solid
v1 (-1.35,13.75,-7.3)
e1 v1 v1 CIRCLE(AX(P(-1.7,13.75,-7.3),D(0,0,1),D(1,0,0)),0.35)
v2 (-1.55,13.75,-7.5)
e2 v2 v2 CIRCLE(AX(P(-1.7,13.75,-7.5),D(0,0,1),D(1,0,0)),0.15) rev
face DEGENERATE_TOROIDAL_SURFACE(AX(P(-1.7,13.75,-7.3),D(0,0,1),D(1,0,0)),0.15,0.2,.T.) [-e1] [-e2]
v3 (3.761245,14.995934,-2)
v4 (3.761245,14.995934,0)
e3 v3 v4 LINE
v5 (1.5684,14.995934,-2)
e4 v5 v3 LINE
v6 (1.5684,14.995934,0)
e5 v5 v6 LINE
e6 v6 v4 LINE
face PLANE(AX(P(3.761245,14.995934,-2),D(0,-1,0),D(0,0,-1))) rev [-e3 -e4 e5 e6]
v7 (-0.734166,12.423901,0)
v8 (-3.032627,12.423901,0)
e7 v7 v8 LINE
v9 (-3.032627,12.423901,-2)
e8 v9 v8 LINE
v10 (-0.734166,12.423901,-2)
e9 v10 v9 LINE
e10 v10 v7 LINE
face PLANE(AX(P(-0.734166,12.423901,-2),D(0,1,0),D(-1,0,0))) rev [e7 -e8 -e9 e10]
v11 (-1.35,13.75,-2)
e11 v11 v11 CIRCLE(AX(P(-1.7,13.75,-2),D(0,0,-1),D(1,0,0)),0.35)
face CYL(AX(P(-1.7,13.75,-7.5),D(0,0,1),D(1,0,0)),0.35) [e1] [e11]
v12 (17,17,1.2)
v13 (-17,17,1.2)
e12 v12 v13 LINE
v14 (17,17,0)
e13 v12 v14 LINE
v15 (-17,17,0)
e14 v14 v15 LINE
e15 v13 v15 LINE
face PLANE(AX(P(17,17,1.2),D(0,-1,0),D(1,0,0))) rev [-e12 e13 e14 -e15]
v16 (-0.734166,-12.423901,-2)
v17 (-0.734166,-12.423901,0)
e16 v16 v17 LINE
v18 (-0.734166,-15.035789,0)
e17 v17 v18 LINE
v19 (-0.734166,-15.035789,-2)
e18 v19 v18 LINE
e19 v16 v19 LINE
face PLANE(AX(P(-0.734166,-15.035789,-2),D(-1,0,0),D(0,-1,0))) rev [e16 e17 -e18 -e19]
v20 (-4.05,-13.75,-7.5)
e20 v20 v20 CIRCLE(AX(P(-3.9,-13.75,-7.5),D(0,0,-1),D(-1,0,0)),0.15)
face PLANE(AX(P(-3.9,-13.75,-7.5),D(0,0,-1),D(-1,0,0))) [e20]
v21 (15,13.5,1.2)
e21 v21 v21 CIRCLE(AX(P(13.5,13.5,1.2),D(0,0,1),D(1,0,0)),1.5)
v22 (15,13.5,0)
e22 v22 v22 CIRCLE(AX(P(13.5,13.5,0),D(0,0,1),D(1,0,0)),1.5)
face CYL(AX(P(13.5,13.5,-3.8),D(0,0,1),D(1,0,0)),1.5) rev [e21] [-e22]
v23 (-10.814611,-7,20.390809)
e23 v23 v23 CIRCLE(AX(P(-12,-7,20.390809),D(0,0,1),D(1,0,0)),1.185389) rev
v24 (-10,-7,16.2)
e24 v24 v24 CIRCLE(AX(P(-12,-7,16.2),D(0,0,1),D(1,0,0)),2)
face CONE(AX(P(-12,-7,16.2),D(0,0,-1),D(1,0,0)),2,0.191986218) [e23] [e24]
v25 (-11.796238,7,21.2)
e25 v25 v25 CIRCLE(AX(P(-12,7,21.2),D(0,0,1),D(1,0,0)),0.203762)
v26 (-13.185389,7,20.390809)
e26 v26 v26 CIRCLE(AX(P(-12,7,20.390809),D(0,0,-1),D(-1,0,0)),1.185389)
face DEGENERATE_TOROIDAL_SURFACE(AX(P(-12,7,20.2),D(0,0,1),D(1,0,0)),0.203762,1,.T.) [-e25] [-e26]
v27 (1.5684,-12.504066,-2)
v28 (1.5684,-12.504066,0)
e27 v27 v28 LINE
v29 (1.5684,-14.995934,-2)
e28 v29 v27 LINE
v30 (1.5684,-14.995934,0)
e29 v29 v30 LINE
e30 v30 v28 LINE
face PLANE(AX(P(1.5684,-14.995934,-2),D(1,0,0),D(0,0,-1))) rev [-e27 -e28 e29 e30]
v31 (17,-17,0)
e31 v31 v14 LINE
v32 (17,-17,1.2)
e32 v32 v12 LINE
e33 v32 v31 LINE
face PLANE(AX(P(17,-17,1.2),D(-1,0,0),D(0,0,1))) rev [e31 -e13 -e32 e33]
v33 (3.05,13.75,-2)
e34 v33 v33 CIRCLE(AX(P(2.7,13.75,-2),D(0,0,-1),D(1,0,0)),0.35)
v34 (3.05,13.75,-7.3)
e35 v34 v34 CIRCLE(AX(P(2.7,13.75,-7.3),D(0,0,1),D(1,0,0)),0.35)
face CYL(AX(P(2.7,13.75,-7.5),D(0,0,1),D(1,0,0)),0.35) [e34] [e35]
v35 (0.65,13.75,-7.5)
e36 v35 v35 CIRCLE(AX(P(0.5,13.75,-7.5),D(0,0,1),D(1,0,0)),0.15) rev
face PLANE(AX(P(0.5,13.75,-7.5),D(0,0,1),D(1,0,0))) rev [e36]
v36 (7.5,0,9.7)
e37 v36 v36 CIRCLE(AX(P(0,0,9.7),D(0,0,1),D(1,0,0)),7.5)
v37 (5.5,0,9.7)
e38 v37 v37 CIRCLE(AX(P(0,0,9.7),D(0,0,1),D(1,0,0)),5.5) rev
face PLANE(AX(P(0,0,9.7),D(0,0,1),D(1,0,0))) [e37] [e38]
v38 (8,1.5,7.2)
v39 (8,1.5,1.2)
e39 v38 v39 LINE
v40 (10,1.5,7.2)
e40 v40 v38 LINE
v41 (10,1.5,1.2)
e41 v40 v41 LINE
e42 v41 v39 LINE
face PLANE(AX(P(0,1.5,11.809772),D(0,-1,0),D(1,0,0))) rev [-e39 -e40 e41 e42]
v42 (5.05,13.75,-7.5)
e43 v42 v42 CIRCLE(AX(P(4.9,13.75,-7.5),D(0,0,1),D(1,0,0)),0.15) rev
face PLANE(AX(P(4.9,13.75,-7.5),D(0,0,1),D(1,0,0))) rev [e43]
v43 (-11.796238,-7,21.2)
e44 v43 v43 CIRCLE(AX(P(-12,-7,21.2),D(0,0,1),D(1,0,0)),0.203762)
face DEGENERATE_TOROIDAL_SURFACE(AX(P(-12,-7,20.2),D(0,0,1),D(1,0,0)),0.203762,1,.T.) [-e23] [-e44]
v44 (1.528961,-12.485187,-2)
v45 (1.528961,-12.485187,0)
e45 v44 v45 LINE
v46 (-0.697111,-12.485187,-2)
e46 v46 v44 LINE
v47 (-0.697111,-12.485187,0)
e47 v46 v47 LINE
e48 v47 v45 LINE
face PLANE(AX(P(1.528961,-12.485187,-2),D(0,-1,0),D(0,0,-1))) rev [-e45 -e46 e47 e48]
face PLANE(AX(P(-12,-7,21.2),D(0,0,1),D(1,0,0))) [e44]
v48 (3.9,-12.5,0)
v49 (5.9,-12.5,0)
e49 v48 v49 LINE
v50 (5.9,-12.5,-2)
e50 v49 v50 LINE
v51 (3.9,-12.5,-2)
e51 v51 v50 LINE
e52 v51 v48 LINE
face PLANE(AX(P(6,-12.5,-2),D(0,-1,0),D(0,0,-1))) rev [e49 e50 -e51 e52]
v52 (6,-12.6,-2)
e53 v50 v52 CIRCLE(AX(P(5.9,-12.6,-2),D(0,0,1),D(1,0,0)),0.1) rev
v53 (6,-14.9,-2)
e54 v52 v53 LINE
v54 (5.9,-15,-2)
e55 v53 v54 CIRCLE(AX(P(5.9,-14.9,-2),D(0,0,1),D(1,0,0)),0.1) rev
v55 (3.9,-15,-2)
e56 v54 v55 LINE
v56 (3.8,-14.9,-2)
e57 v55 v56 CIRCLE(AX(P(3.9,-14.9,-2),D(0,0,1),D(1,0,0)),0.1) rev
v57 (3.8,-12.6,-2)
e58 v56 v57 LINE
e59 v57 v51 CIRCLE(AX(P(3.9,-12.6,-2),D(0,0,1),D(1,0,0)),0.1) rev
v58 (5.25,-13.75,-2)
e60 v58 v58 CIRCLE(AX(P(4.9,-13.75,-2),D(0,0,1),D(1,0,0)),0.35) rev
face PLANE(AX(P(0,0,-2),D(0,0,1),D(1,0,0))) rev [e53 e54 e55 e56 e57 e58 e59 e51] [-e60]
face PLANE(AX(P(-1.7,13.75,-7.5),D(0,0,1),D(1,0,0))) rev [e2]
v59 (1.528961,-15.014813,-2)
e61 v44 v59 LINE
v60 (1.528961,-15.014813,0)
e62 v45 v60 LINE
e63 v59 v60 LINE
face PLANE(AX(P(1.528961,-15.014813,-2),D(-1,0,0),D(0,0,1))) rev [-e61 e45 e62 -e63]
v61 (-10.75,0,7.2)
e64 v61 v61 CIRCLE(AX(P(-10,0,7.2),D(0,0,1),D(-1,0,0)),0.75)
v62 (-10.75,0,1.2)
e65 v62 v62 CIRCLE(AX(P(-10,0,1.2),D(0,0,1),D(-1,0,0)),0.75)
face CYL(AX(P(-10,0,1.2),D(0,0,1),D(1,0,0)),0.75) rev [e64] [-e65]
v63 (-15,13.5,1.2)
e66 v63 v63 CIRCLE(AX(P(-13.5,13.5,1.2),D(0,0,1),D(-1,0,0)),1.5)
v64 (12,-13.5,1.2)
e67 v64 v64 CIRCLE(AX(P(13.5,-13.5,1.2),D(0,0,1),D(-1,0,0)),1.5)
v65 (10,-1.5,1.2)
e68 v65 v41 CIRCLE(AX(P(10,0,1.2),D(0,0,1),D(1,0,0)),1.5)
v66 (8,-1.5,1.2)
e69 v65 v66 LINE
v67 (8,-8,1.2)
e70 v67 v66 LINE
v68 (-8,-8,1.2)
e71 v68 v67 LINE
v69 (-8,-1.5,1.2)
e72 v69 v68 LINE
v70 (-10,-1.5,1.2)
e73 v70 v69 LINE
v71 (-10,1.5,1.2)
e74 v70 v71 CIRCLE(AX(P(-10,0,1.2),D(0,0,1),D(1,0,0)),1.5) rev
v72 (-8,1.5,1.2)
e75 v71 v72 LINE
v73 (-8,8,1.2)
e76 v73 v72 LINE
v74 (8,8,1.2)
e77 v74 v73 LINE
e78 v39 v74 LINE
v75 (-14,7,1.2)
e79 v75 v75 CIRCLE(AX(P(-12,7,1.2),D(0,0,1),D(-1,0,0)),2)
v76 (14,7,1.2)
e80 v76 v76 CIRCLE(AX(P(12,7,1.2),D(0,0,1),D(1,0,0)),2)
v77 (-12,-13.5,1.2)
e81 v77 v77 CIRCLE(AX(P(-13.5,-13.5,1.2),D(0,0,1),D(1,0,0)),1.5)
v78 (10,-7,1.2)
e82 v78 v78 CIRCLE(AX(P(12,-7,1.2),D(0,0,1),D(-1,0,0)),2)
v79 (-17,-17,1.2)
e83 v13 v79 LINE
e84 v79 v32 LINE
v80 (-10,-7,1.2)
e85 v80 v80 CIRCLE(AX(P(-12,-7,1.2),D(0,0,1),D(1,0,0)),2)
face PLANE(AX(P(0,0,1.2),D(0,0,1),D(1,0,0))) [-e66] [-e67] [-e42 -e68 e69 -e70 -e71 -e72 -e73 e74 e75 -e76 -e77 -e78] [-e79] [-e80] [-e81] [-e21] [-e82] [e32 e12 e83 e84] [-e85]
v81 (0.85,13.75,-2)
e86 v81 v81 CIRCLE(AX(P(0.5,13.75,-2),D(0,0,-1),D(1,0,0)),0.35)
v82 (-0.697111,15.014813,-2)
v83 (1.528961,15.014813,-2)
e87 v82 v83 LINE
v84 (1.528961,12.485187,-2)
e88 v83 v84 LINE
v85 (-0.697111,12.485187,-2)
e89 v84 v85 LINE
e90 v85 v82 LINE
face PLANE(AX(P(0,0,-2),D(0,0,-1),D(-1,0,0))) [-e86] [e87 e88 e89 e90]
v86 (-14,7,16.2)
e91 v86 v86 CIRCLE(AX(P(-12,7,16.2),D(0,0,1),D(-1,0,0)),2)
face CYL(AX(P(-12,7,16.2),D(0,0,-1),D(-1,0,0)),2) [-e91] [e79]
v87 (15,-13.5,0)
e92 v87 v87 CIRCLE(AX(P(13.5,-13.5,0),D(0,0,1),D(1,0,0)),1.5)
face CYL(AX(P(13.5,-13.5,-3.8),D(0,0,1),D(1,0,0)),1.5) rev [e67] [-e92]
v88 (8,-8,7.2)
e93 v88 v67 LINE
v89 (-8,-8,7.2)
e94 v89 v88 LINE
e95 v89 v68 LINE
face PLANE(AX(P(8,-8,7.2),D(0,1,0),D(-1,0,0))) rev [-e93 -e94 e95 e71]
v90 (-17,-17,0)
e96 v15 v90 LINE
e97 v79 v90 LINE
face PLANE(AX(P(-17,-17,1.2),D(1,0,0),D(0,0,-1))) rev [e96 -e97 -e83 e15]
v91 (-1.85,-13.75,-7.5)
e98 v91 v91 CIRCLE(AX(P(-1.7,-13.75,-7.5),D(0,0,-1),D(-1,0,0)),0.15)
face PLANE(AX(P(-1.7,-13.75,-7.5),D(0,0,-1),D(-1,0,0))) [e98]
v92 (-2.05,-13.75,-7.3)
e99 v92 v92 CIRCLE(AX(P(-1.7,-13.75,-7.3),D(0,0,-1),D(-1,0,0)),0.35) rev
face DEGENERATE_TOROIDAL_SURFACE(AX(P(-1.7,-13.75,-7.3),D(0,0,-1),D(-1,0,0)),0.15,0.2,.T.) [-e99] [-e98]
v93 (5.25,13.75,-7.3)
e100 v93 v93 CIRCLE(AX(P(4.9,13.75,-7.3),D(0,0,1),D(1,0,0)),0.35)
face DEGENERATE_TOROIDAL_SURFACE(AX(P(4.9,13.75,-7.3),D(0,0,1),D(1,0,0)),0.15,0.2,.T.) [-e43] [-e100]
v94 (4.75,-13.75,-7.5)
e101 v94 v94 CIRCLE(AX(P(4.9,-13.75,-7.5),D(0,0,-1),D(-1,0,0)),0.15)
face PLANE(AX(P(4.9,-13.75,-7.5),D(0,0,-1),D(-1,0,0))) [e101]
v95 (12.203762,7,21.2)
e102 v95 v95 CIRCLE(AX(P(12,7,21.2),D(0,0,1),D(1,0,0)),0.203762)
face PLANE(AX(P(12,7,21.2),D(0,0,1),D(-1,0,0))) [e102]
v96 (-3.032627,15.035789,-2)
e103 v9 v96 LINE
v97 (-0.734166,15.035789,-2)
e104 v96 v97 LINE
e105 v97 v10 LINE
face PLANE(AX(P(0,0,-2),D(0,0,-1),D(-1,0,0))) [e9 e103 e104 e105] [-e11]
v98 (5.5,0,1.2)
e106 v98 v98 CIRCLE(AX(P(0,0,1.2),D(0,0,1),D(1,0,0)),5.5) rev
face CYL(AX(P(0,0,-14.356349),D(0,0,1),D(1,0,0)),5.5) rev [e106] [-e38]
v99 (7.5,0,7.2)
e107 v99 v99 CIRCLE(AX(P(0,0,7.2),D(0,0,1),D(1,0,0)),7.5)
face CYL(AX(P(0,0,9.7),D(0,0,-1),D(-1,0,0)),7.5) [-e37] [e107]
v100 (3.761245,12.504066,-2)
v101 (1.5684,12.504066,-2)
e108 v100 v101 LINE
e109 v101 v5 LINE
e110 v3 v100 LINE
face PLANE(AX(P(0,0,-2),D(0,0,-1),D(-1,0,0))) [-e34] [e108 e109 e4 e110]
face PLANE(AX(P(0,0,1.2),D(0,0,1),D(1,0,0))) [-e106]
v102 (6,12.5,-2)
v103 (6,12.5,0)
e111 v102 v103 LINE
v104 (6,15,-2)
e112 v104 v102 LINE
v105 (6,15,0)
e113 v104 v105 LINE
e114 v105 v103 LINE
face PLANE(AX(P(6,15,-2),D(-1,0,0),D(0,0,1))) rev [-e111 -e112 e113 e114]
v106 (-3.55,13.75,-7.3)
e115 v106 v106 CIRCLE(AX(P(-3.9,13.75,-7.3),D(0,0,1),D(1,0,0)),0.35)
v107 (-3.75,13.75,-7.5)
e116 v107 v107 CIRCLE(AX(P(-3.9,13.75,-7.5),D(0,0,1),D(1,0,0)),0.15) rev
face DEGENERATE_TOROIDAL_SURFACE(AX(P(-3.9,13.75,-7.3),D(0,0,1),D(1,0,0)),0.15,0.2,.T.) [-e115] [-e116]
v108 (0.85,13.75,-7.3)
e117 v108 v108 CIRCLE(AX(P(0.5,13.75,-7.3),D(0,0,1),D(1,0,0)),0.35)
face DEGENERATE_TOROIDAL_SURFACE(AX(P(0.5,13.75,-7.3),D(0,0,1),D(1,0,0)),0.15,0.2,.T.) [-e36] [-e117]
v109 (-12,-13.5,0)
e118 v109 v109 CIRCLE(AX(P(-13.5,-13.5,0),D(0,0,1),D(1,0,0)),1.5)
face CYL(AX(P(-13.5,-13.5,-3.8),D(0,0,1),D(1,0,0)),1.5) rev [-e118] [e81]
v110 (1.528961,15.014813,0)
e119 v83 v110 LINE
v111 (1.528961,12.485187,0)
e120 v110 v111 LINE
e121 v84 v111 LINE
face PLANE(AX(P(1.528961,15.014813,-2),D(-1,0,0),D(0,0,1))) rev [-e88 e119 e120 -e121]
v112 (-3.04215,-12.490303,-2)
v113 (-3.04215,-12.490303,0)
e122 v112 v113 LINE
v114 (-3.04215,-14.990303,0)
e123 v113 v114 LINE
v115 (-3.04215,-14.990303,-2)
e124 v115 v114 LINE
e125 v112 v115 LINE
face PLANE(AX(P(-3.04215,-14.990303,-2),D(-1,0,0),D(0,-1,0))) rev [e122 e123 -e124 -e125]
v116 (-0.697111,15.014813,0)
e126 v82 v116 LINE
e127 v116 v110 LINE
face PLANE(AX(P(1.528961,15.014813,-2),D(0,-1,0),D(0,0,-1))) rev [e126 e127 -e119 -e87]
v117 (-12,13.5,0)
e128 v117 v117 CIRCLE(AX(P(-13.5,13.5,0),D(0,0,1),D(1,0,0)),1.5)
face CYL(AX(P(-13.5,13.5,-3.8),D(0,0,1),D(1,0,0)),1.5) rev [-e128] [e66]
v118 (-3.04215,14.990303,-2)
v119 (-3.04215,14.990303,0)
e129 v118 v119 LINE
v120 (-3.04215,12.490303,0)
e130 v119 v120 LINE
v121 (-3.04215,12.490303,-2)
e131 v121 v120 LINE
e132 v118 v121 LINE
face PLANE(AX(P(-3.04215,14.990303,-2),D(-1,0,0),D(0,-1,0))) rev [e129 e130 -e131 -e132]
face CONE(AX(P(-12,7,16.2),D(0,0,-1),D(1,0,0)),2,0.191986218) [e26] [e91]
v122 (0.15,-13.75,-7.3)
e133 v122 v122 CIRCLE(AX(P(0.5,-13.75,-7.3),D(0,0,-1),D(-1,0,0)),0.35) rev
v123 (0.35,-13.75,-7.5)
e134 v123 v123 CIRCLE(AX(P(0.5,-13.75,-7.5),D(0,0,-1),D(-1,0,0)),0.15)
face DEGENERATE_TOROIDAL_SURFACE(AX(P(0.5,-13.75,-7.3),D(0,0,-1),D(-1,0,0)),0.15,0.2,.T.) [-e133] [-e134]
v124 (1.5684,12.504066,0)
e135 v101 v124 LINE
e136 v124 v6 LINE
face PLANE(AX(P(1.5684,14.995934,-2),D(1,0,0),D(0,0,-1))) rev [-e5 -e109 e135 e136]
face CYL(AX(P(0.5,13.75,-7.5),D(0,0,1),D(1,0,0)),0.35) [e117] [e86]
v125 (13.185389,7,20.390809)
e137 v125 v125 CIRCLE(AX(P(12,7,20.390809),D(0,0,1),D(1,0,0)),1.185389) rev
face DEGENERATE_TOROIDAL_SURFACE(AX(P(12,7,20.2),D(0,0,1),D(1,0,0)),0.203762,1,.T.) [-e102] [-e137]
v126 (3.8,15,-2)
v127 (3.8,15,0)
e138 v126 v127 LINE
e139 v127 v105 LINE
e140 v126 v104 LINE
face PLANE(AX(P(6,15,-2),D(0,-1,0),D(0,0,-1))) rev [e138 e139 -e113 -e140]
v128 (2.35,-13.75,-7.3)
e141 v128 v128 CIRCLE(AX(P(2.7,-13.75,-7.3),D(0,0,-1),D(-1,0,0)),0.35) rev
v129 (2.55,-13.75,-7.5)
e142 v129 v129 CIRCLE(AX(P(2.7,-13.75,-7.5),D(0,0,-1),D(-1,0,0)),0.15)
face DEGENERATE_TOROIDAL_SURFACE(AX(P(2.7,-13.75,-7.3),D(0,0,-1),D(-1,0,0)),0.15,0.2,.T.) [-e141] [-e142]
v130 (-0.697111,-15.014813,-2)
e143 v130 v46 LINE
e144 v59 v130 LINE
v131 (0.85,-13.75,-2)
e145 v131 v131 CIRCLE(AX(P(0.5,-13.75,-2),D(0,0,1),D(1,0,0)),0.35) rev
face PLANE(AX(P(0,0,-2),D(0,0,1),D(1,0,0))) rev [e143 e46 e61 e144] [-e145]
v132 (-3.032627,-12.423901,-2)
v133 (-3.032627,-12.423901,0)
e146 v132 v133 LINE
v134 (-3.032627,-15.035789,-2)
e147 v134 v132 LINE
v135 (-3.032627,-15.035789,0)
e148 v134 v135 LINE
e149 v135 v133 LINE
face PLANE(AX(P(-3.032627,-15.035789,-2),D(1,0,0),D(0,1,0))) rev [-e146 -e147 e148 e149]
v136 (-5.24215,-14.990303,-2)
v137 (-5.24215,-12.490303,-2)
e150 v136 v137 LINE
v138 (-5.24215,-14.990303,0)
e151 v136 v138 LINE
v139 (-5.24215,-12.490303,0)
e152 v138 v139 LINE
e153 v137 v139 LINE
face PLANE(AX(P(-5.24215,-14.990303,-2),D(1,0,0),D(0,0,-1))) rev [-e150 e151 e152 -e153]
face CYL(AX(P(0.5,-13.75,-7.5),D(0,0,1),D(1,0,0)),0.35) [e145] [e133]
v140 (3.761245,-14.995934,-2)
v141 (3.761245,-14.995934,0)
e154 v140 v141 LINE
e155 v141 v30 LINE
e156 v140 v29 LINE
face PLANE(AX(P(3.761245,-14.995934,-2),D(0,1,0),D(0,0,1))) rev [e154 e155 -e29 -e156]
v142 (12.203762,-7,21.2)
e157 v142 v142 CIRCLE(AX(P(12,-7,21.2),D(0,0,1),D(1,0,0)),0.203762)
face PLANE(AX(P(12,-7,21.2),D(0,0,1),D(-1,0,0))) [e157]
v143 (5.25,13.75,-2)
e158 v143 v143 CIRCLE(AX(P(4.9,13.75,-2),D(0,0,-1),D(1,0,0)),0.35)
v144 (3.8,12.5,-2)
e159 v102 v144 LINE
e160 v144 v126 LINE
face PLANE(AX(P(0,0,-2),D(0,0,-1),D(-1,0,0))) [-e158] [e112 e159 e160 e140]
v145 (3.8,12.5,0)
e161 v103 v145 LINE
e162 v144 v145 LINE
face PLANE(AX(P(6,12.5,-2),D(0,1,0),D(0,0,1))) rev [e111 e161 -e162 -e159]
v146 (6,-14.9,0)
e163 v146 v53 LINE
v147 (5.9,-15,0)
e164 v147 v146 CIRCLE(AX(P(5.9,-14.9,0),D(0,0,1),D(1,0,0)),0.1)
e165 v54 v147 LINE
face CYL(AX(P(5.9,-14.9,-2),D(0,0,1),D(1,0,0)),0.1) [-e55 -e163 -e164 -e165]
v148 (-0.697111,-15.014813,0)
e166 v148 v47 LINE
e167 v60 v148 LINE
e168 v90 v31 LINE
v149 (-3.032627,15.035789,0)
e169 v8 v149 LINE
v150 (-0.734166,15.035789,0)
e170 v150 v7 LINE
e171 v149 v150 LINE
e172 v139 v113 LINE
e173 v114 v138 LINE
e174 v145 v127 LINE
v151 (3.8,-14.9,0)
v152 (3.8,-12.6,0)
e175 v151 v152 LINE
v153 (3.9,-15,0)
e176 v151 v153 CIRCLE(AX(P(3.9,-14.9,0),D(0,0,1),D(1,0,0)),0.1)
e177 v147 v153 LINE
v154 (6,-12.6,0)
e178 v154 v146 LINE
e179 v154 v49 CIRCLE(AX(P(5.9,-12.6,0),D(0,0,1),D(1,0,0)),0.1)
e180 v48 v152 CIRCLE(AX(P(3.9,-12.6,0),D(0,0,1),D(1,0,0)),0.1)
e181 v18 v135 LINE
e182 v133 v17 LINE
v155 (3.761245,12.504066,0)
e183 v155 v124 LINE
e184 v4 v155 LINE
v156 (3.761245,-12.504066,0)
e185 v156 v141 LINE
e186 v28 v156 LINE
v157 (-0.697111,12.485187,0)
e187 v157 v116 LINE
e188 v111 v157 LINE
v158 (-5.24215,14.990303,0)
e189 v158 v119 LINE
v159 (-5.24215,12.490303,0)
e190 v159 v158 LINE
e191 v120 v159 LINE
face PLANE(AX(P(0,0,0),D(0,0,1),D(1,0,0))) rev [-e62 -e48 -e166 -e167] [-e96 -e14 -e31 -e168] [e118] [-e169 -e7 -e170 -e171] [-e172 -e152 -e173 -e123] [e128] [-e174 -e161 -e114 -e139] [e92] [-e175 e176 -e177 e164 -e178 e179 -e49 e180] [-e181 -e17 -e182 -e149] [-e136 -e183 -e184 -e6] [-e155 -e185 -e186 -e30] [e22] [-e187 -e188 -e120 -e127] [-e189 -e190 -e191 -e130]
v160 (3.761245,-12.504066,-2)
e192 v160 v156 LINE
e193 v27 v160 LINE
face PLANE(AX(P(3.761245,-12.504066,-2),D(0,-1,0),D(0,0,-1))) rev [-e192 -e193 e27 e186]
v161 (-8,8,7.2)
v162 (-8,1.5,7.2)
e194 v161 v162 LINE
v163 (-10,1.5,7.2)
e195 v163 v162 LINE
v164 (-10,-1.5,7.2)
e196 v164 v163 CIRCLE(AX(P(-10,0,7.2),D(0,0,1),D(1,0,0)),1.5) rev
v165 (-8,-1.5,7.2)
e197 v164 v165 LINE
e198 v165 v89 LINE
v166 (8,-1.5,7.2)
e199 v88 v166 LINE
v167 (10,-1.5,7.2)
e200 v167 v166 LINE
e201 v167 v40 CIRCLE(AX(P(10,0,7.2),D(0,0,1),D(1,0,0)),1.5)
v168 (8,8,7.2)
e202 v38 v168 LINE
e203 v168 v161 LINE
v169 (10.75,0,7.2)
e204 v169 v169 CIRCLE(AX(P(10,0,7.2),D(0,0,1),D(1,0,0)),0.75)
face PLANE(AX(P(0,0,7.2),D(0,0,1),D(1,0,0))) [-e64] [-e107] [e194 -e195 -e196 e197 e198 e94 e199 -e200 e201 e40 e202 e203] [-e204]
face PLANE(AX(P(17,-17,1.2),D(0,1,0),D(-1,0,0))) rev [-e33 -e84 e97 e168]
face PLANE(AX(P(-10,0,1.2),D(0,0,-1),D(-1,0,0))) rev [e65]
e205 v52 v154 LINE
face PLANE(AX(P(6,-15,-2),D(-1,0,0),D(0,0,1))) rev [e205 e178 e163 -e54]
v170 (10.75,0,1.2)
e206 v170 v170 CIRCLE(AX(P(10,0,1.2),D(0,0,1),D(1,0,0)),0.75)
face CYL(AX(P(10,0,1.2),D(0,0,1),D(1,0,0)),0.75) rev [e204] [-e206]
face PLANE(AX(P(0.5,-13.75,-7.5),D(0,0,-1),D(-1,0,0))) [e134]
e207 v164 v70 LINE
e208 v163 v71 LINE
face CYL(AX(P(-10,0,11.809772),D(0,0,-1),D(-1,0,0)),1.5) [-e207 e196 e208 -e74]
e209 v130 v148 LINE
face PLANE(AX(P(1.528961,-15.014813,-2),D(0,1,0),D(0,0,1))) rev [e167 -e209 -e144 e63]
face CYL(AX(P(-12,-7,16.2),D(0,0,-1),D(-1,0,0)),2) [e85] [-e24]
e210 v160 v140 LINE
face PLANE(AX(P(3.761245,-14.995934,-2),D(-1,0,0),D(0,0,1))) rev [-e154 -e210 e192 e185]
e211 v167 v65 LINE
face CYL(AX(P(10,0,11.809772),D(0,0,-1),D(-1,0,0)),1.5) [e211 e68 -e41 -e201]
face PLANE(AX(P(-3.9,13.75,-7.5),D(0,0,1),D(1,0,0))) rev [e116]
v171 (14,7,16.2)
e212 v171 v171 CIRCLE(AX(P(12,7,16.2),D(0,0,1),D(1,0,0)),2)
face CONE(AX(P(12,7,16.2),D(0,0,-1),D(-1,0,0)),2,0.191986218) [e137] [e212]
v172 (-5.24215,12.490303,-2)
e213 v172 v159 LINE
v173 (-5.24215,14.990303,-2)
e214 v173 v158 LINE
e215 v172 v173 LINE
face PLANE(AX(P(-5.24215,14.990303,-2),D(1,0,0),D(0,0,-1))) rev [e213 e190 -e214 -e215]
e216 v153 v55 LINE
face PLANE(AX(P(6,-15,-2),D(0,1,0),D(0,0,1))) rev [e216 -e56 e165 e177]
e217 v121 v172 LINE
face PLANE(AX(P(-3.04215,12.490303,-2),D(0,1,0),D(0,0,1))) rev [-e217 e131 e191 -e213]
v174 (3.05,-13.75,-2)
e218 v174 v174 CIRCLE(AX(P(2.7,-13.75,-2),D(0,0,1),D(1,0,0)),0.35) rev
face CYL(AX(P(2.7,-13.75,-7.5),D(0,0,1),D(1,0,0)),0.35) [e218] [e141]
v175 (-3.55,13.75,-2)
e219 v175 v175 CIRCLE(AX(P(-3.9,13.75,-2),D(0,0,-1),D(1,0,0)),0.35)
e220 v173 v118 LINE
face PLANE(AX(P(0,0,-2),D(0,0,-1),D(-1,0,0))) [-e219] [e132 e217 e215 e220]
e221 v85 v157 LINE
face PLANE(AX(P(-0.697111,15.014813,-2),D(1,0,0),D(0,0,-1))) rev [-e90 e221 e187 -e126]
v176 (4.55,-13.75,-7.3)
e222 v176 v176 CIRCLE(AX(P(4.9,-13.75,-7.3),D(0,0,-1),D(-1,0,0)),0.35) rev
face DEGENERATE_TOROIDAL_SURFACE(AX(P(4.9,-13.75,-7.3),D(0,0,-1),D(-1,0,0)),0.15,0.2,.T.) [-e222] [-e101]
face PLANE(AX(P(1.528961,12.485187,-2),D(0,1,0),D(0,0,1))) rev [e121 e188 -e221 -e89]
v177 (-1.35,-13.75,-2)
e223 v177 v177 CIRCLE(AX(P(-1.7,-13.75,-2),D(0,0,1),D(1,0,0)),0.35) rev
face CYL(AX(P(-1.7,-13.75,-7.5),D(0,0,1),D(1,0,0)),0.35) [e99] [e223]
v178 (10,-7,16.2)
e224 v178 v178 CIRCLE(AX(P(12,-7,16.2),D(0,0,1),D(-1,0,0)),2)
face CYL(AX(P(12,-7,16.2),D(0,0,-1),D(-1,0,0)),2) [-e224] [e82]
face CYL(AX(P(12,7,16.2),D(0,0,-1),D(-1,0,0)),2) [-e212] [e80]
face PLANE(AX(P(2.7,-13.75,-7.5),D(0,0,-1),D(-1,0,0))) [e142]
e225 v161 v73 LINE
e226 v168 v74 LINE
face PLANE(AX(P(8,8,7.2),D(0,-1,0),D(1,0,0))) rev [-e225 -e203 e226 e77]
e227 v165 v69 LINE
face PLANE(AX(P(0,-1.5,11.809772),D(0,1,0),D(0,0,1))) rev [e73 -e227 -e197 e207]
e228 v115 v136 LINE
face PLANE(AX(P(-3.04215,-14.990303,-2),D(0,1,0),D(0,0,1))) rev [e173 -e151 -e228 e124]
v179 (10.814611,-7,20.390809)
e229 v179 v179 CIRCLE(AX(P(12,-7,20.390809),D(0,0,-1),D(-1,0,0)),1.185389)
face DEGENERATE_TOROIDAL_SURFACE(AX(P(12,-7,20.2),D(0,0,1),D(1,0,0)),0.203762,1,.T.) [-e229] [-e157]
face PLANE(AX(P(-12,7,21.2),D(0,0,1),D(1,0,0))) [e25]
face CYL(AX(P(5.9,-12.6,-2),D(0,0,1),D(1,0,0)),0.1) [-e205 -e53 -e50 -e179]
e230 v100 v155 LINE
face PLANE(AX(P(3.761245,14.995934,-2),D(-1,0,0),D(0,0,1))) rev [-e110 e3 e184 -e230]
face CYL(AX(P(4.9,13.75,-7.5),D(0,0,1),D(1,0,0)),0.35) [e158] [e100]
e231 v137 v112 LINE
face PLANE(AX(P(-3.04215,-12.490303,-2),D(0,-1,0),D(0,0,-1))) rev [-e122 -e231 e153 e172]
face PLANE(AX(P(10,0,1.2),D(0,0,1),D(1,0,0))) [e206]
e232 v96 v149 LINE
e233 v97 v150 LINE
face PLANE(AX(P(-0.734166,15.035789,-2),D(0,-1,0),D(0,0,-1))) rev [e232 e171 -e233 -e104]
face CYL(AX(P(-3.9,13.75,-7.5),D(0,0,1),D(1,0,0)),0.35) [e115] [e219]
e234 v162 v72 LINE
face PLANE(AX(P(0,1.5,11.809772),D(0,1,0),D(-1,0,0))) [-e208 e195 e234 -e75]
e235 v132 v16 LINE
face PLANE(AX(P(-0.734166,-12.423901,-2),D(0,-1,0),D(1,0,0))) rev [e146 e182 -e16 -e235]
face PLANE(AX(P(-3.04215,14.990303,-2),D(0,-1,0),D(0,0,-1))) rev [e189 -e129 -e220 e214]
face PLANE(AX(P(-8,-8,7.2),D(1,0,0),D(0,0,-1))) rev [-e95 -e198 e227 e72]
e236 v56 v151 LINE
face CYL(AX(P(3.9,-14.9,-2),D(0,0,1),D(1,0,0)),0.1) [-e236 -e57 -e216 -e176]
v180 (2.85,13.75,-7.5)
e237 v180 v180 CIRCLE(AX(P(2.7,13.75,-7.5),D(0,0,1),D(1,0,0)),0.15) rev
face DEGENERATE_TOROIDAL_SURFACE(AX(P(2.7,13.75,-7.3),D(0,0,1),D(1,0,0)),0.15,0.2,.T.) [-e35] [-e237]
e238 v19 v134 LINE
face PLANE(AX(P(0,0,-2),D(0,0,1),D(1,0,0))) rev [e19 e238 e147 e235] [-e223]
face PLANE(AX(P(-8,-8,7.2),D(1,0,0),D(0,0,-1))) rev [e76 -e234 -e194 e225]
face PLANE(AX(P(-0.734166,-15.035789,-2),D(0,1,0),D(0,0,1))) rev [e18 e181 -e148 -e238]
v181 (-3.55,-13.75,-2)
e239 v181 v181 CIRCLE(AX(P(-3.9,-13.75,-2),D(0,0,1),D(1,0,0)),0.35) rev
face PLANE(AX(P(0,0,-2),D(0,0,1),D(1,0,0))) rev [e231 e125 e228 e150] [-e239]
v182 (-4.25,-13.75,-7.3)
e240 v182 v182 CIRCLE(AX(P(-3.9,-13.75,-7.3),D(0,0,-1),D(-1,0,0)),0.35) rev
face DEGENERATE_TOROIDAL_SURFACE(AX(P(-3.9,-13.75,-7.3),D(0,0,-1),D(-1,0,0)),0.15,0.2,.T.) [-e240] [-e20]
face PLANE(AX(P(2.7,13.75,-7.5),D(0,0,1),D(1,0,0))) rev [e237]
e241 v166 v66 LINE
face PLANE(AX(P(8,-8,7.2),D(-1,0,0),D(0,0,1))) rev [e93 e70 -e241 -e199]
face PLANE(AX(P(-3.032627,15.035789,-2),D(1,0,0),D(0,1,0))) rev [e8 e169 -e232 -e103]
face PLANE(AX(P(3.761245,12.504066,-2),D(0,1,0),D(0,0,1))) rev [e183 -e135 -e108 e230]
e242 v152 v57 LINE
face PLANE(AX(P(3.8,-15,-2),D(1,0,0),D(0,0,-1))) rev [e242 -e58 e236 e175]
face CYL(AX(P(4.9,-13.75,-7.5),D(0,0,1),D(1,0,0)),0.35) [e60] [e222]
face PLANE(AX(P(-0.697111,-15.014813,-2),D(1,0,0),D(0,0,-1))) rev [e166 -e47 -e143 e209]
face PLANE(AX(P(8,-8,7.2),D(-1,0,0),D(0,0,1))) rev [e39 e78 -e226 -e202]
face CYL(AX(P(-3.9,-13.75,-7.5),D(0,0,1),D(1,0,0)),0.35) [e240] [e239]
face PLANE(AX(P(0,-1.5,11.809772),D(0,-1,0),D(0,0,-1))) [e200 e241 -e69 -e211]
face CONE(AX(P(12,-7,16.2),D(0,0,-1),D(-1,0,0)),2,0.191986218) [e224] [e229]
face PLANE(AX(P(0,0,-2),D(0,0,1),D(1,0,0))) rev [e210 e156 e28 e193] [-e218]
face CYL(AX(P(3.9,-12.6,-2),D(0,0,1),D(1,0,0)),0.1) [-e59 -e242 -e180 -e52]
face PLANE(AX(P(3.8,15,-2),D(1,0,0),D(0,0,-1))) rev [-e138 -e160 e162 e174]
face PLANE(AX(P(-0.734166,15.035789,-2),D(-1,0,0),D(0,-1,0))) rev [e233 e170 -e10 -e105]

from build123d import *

# Parameters (mm, degrees)
SKETCH1_W            = 34
SKETCH1_H            = 34
BOSS_EXTRUDE1_DEPTH  = 1.2
SKETCH2_W            = 16
SKETCH2_H            = 16
BOSS_EXTRUDE2_DEPTH  = 6
SKETCH3_R            = 5.5
CUT_EXTRUDE1_DEPTH   = 6
SKETCH4_R            = 1.5
BOSS_EXTRUDE3_DEPTH  = 6
SKETCH6_R            = 0.75
CUT_EXTRUDE2_DEPTH   = 6
BOSS_EXTRUDE4_START  = 2.5
SKETCH8_R            = 7.5
SKETCH8_R_2          = 5.5
BOSS_EXTRUDE4_DEPTH  = 2.5
SKETCH9_R            = 2
BOSS_EXTRUDE5_DEPTH  = 15
SKETCH12_R           = 2
BOSS_EXTRUDE6_DEPTH  = 5
BOSS_EXTRUDE6_TAPER  = 11
FILLET6_R            = 1
FILLET6_OF_MIRROR1_R = 1
SKETCH14_R           = 1.5
CUT_EXTRUDE3_DEPTH   = 5
SKETCH15_W           = 2.2
SKETCH15_H           = 2.5
SKETCH15_W_2         = 2.192844648
SKETCH15_H_2         = 2.491868918
SKETCH15_W_3         = 2.22607144
SKETCH15_H_3         = 2.529626636
SKETCH15_W_4         = 2.298461583
SKETCH15_H_4         = 2.611888162
BOSS_EXTRUDE7_DEPTH  = 2
FILLET7_R            = 0.1
SKETCH16_R           = 0.35
BOSS_EXTRUDE8_DEPTH  = 5.5
FILLET8_R            = 0.2
FILLET9_R            = 0.2
FILLET10_R           = 0.2


# Read off the part's stored shape, not the designer's step: Mirror2
with BuildPart() as part:
    # Sketch1 → Boss-Extrude1 (new body)
    with BuildSketch(Plane.XY):
        Rectangle(SKETCH1_W, SKETCH1_H)
    extrude(amount=BOSS_EXTRUDE1_DEPTH)

    # Sketch2 → Boss-Extrude2 (add)
    with BuildSketch(Plane.XY.offset(1.2)):
        Rectangle(SKETCH2_W, SKETCH2_H)
    extrude(amount=BOSS_EXTRUDE2_DEPTH)

    # Sketch3 → Cut-Extrude1 (cut)
    with BuildSketch(Plane.XY.offset(7.2)):
        Circle(SKETCH3_R)
    extrude(amount=-CUT_EXTRUDE1_DEPTH, mode=Mode.SUBTRACT)

    # Sketch4 → Boss-Extrude3 (add)
    with BuildSketch(Plane.XY.offset(1.2)):
        with BuildLine():
            ThreePointArc((10, -1.5), (8.5, 0), (10, 1.5))
            Line((10, 1.5), (8, 1.5))
            Line((8, 1.5), (8, -1.5))
            Line((8, -1.5), (10, -1.5))
        make_face()
        with Locations((10, 0)):
            Circle(SKETCH4_R)
        with Locations((-10, 0)):
            Circle(SKETCH4_R)
        with BuildLine():
            ThreePointArc((-8.5, 0), (-8.939339828, -1.060660172), (-10, -1.5))
            Line((-10, -1.5), (-8, -1.5))
            Line((-8, -1.5), (-8, 1.5))
            Line((-8, 1.5), (-10, 1.5))
            ThreePointArc((-10, 1.5), (-8.939339828, 1.060660172), (-8.5, 0))
        make_face()
    extrude(amount=BOSS_EXTRUDE3_DEPTH)

    # Sketch6 → Cut-Extrude2 (cut)
    with BuildSketch(Plane.XY.offset(7.2)):
        with Locations((10, 0)):
            Circle(SKETCH6_R)
        with Locations(Location((-10, 0, 0), (0, 0, 180))):
            Circle(SKETCH6_R)
    extrude(amount=-CUT_EXTRUDE2_DEPTH, mode=Mode.SUBTRACT)

    # Sketch8 → Boss-Extrude4 (add)
    with BuildSketch(Plane.XY.offset(7.2).offset(BOSS_EXTRUDE4_START)):
        Circle(SKETCH8_R)
        Circle(SKETCH8_R_2, mode=Mode.SUBTRACT)
    extrude(amount=-BOSS_EXTRUDE4_DEPTH)

    # Sketch9 → Boss-Extrude5 (add)
    with BuildSketch(Plane.XY.offset(1.2)):
        with Locations((-12, -7)):
            Circle(SKETCH9_R)
        with Locations(Location((12, -7, 0), (0, 0, 180))):
            Circle(SKETCH9_R)
        with Locations((12, 7)):
            Circle(SKETCH9_R)
        with Locations(Location((-12, 7, 0), (0, 0, 180))):
            Circle(SKETCH9_R)
    extrude(amount=BOSS_EXTRUDE5_DEPTH)

    # Sketch12 → Boss-Extrude6 (add)
    with BuildSketch(Plane.XY.offset(16.2)):
        with Locations(Location((-12, 7, 0), (0, 0, 180))):
            Circle(SKETCH12_R)
    boss_extrude6 = extrude(amount=BOSS_EXTRUDE6_DEPTH, taper=BOSS_EXTRUDE6_TAPER)

    # Fillet6
    fillet6_edges = [part.edges().sort_by_distance(p)[0] for p in [
        (-10.971901546, 7, 21.2),
    ]]
    fillet(fillet6_edges, radius=FILLET6_R)

    # Mirror1: Boss-Extrude6 across plane
    add(boss_extrude6.mirror(Plane(origin=(0, 0, 0), x_dir=(0, 0, 1), z_dir=(1, 0, 0))))

    # Fillet6 of Mirror1
    fillet6_of_mirror1_edges = [part.edges().sort_by_distance(p)[0] for p in [
        (10.971901546, 7, 21.2),
    ]]
    fillet(fillet6_of_mirror1_edges, radius=FILLET6_OF_MIRROR1_R)

    # Mirror2 outline → Mirror2 (revolve)
    with BuildSketch(Plane(origin=(-12, -7, 0), x_dir=(1, 0, 0), z_dir=(0, -1, 0))):
        with BuildLine():
            Line((0.203762068, 21.2), (0, 21.2))
            Line((0, 21.2), (0, 16.2))
            Line((0, 16.2), (2, 16.2))
            Line((2, 16.2), (1.185389252, 20.390808995))
            ThreePointArc((1.185389252, 20.390808995), (0.839840289, 20.971624583), (0.203762068, 21.2))
        make_face()
    revolve(axis=Axis((-12, -7, 0), (0, 0, 1)))

    # Mirror2 2 outline → Mirror2 2 (revolve)
    with BuildSketch(Plane(origin=(12, -7, 0), x_dir=(1, 0, 0), z_dir=(0, -1, 0))):
        with BuildLine():
            Line((0.203762068, 21.2), (0, 21.2))
            Line((0, 21.2), (0, 16.2))
            Line((0, 16.2), (2, 16.2))
            Line((2, 16.2), (1.185389252, 20.390808995))
            ThreePointArc((1.185389252, 20.390808995), (0.839840289, 20.971624583), (0.203762068, 21.2))
        make_face()
    revolve(axis=Axis((12, -7, 0), (0, 0, 1)))

    # Sketch14 → Cut-Extrude3 (cut)
    with BuildSketch(Plane.XY.offset(1.2)):
        with Locations((-13.5, -13.5)):
            Circle(SKETCH14_R)
        with Locations((13.5, -13.5)):
            Circle(SKETCH14_R)
        with Locations((13.5, 13.5)):
            Circle(SKETCH14_R)
        with Locations((-13.5, 13.5)):
            Circle(SKETCH14_R)
    extrude(amount=-CUT_EXTRUDE3_DEPTH, mode=Mode.SUBTRACT)

    # Sketch15 → Boss-Extrude7 (add)
    with BuildSketch(Plane(origin=(0, 0, 0), x_dir=(-1, 0, 0), z_dir=(0, 0, -1))):
        with Locations((-4.9, -13.75)):
            Rectangle(SKETCH15_W, SKETCH15_H)
        with Locations((-2.664822821, -13.75)):
            Rectangle(SKETCH15_W_2, SKETCH15_H_2)
        with Locations((-0.415924927, -13.75)):
            Rectangle(SKETCH15_W_3, SKETCH15_H_3)
        with Locations((1.883396687, -13.729844671)):
            Rectangle(SKETCH15_W_4, SKETCH15_H_4)
        with Locations((4.142150046, -13.740303192)):
            Rectangle(SKETCH15_W, SKETCH15_H)
        with Locations((4.142150046, 13.740303192)):
            Rectangle(SKETCH15_W, SKETCH15_H)
        with Locations((1.883396687, 13.729844671)):
            Rectangle(SKETCH15_W_4, SKETCH15_H_4)
        with Locations((-0.415924927, 13.75)):
            Rectangle(SKETCH15_W_3, SKETCH15_H_3)
        with Locations((-2.664822821, 13.75)):
            Rectangle(SKETCH15_W_2, SKETCH15_H_2)
        with Locations((-4.9, 13.75)):
            Rectangle(SKETCH15_W, SKETCH15_H)
    extrude(amount=BOSS_EXTRUDE7_DEPTH)

    # Fillet7
    fillet7_edges = [part.edges().sort_by_distance(p)[0] for p in [
        (3.8, -15, -1),
        (3.8, -12.5, -1),
        (6, -12.5, -1),
        (6, -15, -1),
    ]]
    fillet(fillet7_edges, radius=FILLET7_R)

    # Sketch16 → Boss-Extrude8 (add)
    with BuildSketch(Plane(origin=(0, 0, -2), x_dir=(-1, 0, 0), z_dir=(0, 0, -1))):
        with Locations(Location((-4.9, -13.75, 0), (0, 0, 180))):
            Circle(SKETCH16_R)
        with Locations(Location((-2.7, -13.75, 0), (0, 0, 180))):
            Circle(SKETCH16_R)
        with Locations(Location((-0.5, -13.75, 0), (0, 0, 180))):
            Circle(SKETCH16_R)
        with Locations(Location((1.7, -13.75, 0), (0, 0, 180))):
            Circle(SKETCH16_R)
        with Locations(Location((3.9, -13.75, 0), (0, 0, 180))):
            Circle(SKETCH16_R)
        with Locations(Location((3.9, 13.75, 0), (0, 0, 180))):
            Circle(SKETCH16_R)
        with Locations(Location((1.7, 13.75, 0), (0, 0, 180))):
            Circle(SKETCH16_R)
        with Locations(Location((-0.5, 13.75, 0), (0, 0, 180))):
            Circle(SKETCH16_R)
        with Locations(Location((-2.7, 13.75, 0), (0, 0, 180))):
            Circle(SKETCH16_R)
        with Locations(Location((-4.9, 13.75, 0), (0, 0, 180))):
            Circle(SKETCH16_R)
    extrude(amount=BOSS_EXTRUDE8_DEPTH)

    # Fillet8
    fillet8_edges = [part.edges().sort_by_distance(p)[0] for p in [
        (4.55, -13.75, -7.5),
    ]]
    fillet(fillet8_edges, radius=FILLET8_R)

    # Fillet9
    fillet9_edges = [part.edges().sort_by_distance(p)[0] for p in [
        (2.35, -13.75, -7.5),
        (0.15, -13.75, -7.5),
        (-2.05, -13.75, -7.5),
        (-4.25, -13.75, -7.5),
    ]]
    fillet(fillet9_edges, radius=FILLET9_R)

    # Fillet10
    fillet10_edges = [part.edges().sort_by_distance(p)[0] for p in [
        (-4.25, 13.75, -7.5),
        (-2.05, 13.75, -7.5),
        (0.15, 13.75, -7.5),
        (2.35, 13.75, -7.5),
        (4.55, 13.75, -7.5),
    ]]
    fillet(fillet10_edges, radius=FILLET10_R)


solid = part.part
